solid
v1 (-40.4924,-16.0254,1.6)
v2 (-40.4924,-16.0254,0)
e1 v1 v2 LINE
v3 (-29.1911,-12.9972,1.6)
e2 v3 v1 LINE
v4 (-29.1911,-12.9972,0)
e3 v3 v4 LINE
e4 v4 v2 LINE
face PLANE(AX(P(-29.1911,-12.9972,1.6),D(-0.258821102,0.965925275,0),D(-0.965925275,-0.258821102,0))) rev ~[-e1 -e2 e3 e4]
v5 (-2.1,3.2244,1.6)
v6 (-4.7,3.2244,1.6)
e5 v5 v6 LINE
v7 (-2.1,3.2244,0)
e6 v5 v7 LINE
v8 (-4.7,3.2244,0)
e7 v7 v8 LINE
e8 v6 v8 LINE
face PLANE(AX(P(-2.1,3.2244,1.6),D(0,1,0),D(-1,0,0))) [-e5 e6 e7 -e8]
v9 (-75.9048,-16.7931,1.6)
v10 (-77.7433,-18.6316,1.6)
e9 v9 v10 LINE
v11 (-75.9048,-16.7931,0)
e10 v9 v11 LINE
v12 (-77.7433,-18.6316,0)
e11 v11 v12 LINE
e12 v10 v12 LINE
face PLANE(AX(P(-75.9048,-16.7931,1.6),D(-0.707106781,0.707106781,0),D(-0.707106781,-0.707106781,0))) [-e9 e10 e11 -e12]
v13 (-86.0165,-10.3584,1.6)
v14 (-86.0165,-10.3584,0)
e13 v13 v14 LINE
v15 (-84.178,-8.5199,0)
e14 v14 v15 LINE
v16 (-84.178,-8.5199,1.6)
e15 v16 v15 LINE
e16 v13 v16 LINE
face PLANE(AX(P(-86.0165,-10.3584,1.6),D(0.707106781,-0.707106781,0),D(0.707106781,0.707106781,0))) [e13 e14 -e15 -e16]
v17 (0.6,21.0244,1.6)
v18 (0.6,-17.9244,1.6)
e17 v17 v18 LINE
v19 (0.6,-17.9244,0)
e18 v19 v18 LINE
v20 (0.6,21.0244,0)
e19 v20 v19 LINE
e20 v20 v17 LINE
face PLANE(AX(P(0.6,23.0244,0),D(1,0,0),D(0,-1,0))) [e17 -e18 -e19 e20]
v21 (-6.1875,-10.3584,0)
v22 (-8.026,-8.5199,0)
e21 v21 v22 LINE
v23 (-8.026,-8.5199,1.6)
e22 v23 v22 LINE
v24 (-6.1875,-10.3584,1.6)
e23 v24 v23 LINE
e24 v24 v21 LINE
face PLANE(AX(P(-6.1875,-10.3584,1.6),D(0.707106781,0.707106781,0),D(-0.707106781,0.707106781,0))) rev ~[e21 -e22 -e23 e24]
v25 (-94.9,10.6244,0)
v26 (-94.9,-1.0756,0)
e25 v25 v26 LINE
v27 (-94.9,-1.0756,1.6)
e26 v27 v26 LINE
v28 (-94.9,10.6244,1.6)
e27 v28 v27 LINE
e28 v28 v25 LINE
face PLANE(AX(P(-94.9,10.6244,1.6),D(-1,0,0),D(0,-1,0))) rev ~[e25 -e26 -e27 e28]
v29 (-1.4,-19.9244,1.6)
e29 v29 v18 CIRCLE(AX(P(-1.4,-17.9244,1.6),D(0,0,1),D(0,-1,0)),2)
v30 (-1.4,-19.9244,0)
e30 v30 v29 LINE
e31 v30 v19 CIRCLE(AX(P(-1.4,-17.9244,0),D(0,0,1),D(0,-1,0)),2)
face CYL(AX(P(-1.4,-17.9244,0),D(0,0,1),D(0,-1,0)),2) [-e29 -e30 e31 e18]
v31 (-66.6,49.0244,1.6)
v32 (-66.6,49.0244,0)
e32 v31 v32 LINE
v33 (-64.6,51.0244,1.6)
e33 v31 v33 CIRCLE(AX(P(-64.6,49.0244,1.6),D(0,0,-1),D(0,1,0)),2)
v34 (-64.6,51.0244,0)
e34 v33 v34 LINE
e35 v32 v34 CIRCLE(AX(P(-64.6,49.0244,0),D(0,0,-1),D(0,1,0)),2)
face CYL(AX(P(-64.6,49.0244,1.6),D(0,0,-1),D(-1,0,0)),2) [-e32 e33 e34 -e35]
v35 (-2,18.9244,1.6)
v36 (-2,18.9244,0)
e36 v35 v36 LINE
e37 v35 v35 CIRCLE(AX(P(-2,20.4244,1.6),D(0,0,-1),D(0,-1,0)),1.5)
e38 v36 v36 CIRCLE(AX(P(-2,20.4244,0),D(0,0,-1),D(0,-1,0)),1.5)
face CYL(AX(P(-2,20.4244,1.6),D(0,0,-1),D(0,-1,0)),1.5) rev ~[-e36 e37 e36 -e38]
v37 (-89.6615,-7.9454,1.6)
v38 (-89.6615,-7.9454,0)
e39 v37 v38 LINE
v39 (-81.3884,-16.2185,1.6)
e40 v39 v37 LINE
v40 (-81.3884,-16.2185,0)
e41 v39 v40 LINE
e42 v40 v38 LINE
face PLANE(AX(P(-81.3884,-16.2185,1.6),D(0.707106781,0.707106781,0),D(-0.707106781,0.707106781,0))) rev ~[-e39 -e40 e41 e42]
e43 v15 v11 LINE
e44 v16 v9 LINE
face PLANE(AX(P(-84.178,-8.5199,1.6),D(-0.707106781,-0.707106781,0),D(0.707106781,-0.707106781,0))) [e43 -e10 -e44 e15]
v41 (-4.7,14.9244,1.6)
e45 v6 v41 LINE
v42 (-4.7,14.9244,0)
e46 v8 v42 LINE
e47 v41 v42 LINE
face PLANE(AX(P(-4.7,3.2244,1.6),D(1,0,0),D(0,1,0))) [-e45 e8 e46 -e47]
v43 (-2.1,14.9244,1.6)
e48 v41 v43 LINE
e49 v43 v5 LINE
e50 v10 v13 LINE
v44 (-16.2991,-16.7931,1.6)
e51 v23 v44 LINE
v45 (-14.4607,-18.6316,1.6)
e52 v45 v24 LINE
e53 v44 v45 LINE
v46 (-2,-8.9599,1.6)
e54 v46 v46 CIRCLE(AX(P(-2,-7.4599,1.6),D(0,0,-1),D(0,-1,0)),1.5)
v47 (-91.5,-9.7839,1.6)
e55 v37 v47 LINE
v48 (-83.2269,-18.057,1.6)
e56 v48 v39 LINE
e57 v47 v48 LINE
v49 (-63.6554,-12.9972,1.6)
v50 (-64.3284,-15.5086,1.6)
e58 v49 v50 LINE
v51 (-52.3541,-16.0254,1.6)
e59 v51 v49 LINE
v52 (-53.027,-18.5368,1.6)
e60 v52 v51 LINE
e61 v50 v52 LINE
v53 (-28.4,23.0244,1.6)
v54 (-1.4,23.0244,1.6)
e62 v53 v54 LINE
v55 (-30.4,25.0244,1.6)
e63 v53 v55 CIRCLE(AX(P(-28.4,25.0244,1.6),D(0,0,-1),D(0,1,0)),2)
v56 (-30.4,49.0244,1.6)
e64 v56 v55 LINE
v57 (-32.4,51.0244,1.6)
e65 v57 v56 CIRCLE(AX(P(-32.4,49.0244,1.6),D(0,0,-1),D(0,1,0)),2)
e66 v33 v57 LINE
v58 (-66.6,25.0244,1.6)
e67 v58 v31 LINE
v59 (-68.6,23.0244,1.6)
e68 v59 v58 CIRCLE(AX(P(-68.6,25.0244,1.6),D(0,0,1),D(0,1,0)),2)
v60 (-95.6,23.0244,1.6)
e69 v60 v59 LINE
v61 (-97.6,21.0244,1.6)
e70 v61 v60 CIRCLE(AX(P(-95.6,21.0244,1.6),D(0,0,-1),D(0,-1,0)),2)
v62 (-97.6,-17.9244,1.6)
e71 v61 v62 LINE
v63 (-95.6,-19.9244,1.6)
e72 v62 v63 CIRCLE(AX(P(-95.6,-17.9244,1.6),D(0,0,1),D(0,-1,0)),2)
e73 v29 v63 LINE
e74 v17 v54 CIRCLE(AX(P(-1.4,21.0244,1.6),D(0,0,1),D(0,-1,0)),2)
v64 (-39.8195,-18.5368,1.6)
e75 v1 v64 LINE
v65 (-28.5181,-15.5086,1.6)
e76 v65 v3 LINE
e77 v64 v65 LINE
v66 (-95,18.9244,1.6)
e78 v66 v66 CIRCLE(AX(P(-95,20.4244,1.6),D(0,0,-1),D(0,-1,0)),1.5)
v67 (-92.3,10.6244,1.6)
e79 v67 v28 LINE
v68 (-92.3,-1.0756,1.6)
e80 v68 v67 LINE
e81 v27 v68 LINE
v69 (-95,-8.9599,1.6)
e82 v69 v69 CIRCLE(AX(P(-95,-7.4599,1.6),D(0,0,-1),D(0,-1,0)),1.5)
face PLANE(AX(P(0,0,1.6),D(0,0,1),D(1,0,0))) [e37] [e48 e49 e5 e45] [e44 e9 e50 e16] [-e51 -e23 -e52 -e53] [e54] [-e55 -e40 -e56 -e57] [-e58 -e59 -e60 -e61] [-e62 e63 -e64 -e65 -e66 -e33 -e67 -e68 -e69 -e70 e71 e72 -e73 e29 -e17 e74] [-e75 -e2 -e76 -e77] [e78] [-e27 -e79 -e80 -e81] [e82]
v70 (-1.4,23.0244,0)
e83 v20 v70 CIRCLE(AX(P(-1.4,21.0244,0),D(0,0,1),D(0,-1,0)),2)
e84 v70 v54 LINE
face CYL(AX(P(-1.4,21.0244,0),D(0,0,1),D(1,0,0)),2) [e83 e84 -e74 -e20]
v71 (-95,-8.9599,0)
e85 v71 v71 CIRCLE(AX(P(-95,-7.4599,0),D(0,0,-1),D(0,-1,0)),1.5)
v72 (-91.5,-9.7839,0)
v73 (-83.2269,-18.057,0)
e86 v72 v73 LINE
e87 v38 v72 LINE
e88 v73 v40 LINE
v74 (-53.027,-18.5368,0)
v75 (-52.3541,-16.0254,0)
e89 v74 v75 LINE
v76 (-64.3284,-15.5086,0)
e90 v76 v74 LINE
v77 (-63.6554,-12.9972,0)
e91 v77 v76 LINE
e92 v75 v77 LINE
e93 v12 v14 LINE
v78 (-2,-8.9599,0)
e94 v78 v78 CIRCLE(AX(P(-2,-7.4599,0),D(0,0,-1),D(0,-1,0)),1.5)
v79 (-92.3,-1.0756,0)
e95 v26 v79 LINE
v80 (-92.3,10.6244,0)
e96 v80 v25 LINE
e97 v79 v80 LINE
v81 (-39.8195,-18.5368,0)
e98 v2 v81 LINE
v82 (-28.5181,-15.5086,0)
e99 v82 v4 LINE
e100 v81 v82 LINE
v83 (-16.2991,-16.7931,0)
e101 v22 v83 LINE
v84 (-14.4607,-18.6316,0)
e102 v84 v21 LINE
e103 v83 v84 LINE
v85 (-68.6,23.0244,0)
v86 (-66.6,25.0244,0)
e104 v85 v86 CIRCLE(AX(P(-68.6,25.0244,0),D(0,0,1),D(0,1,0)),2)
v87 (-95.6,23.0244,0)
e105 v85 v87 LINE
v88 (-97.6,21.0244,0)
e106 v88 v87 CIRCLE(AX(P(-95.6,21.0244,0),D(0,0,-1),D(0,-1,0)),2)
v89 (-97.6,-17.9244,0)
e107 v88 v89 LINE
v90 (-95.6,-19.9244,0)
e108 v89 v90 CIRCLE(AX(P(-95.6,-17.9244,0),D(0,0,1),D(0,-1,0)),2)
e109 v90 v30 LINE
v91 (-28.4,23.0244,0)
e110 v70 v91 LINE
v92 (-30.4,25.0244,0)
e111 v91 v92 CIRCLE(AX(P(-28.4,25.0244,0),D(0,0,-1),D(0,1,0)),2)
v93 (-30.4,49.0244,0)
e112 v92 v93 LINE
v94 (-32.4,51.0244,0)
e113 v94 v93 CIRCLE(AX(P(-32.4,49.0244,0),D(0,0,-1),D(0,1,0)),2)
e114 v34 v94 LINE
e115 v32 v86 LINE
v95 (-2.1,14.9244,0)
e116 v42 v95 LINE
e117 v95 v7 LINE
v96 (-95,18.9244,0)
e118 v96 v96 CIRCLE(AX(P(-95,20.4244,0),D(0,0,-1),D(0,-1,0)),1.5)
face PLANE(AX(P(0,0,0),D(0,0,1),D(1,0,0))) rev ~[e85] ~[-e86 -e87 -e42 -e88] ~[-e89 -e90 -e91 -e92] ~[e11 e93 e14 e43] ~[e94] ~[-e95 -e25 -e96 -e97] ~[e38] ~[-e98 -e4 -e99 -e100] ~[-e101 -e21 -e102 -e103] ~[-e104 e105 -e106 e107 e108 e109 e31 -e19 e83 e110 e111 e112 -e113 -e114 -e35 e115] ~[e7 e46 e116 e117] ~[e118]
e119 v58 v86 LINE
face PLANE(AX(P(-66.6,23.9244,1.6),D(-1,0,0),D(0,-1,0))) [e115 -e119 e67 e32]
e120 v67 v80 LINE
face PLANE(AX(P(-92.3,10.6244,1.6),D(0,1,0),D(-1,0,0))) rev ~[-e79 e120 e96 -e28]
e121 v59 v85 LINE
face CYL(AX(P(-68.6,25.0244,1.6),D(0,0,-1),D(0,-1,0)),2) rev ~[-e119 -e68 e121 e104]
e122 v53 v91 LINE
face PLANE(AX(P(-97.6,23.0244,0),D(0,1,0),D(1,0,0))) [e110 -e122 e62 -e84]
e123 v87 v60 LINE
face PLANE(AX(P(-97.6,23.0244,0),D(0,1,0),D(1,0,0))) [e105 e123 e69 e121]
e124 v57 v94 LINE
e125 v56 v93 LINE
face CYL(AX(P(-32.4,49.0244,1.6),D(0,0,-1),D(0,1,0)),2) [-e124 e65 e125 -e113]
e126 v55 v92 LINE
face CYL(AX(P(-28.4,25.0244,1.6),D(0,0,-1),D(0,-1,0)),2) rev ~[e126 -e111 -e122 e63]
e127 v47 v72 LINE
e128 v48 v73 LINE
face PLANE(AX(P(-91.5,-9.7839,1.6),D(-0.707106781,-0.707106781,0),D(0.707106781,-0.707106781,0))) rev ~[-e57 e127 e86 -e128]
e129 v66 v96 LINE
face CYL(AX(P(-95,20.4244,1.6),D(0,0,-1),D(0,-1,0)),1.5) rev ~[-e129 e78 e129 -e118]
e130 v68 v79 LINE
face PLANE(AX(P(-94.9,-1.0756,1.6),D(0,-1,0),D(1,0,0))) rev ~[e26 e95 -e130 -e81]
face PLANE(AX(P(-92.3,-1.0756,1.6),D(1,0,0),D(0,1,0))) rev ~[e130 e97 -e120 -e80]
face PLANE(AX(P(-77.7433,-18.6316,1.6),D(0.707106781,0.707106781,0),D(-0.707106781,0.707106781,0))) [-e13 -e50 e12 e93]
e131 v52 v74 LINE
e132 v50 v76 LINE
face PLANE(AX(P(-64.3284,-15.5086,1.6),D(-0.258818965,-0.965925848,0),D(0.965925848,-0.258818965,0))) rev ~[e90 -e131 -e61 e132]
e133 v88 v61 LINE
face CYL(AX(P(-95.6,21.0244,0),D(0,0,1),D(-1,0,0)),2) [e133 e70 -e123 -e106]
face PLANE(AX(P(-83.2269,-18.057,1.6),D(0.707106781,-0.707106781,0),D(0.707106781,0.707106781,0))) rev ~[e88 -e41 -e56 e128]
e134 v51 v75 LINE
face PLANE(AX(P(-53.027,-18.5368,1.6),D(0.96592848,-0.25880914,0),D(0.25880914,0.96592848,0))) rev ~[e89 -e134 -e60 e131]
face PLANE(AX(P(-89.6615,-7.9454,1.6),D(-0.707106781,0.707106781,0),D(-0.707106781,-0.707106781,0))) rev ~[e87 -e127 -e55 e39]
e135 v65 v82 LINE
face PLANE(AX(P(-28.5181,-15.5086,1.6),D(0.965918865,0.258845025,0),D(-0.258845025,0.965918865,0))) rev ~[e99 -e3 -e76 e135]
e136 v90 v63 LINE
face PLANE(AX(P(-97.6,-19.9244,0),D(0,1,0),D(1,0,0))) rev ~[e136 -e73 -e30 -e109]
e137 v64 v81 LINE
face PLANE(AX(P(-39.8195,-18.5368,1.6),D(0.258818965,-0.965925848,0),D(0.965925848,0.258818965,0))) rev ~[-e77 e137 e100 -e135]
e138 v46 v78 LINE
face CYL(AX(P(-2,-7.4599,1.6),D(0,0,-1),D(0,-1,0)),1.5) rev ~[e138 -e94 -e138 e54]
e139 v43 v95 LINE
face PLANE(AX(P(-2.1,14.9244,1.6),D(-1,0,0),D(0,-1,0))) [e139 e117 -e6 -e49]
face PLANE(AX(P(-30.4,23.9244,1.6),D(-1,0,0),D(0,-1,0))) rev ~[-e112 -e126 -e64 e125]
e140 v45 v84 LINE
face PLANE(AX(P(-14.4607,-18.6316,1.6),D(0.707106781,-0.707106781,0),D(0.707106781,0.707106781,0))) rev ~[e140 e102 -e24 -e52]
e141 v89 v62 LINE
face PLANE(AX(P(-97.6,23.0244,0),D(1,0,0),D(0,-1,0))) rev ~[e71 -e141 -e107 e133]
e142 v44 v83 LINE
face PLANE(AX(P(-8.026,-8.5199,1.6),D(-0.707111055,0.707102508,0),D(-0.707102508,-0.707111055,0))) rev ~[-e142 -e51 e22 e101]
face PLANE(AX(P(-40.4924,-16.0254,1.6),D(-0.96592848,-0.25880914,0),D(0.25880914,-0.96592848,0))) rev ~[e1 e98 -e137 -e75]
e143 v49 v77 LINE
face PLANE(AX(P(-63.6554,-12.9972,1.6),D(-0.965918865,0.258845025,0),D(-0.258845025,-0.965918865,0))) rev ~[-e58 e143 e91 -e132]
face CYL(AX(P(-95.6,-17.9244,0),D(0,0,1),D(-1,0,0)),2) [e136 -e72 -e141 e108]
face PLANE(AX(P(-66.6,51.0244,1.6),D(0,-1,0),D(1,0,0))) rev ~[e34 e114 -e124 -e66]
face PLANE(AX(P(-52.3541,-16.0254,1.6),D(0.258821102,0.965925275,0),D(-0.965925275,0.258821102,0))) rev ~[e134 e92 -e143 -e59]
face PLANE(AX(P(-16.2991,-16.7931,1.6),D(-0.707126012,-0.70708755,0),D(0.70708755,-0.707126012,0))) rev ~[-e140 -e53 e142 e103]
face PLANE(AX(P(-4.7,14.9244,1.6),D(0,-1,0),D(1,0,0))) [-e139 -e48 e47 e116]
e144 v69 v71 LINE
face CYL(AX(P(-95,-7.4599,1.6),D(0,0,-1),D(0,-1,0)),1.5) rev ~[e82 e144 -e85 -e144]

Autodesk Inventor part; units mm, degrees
ref_plane "YZ Plane" through (0, 0, 0) normal (1, 0, 0) x (0, 1, 0)
ref_plane "XZ Plane" through (0, 0, 0) normal (0, 1, 0) x (-1, 0, 0)
ref_plane "XY Plane" through (0, 0, 0) normal (0, 0, 1) x (1, 0, 0)
sketch "Szkic1" plane through (0, 0, 0) normal (0, 0, 1) x (1, 0, 0)
  circle A0 centre (-2, -7.4599) radius 1.4 projected
  circle A1 centre (-2, 20.4244) radius 1.4 projected
  circle A2 centre (-95, -7.4599) radius 1.4 projected
  circle A3 centre (-95, 20.4244) radius 1.4 projected
  line L0 (-98.5, 23.9244) -> (-98.5, -20.9244) projected
  line L1 (-97.6, 23.9244) -> (-97.6, -20.9244)
  line L2 (-98.5, -20.9244) -> (-91.5, -20.9244) projected
  line L3 (-98.5, 23.9244) -> (-91.5, 23.9244) projected
  line L4 (-98.5, -19.9244) -> (-91.5, -19.9244)
  line L5 (-91.5, -7.4599) -> (-91.5, -20.9244) projected
  line L6 (-97.6, 23.0244) -> (-92.3999, 23.0244)
  line L7 (-48.5, -51.6271) -> (-48.5, 68.0164)
  line L8 (-97.6, -19.9244) -> (-48.5, -19.9244)
  line L9 (-48.5, -19.9244) -> (-48.5, 23.0244)
  line L10 (-48.5, 23.0244) -> (-97.6, 23.0244)
  line L11 (-97.6, 23.0244) -> (-97.6, -19.9244)
  line L12 (0.6, -19.9244) -> (-48.5, -19.9244)
  line L13 (-48.5, 23.0244) -> (0.6, 23.0244)
  line L14 (0.6, 23.0244) -> (0.6, -19.9244)
  point P0 (0, 0)
  dimension "d0" = 0.9
  dimension "d1" = 1
  dimension "d2" = 0.9
extrude "Wyciągnięcie proste1" add sketch "Szkic1" along normal blind 1.6 contours L1 L6 L10 L7 L8 L4 | L7 L13 L14 L12
sketch "Szkic2" plane through (0, 0, 1.6) normal (0, 0, 1) x (1, 0, 0)
  line L0 (-29.5, 25.9244) -> (-29.5, 36.1286) projected
  line L1 (-31.5, 51.9244) -> (-65.5, 51.9244) projected
  line L2 (-67.5, 36.1286) -> (-67.5, 25.9244) projected
  line L3 (0.6, 23.0244) -> (-97.6, 23.0244) projected
  line L4 (-29.5, 23.0244) -> (-67.5, 23.0244)
  line L5 (-67.5, 23.0244) -> (-67.5, 51.9244)
  line L6 (-67.5, 51.9244) -> (-29.5, 51.9244)
  line L7 (-29.5, 51.9244) -> (-29.5, 23.0244)
  line L8 (-30.4, 23.9244) -> (-66.6, 23.9244)
  line L9 (-66.6, 23.9244) -> (-66.6, 51.0244)
  line L10 (-66.6, 51.0244) -> (-30.4, 51.0244)
  line L11 (-30.4, 51.0244) -> (-30.4, 23.9244)
  line L12 (-30.4, 23.9244) -> (-30.4, 23.0244)
  line L13 (-66.6, 23.9244) -> (-66.6, 23.0244)
  point P0 (0, 0)
  point P1 (-67.5, 37.4744)
  point P2 (-29.5, 37.4744)
  point P3 (-29.5, 31.0265)
  point P4 (-48.5, 51.9244)
  dimension "d5" = 0.9
extrude "Wyciągnięcie proste2" add sketch "Szkic2" against normal blind 1.6 contours L3 L13 L8 L12 | L8 L9 L10 L11
sketch "Szkic3" plane through (0, 0, 1.6) normal (0, 0, 1) x (1, 0, 0)
  line L0 (-94.4, -0.5756) -> (-94.4, 10.1244) projected
  line L1 (-94.4, 10.1244) -> (-92.8, 10.1244) projected
  line L2 (-92.8, 10.1244) -> (-92.8, -0.5756) projected
  line L3 (-94.4, -0.5756) -> (-92.8, -0.5756) projected
  line L4 (-77.7433, -17.9244) -> (-76.6119, -16.7931) projected
  line L5 (-77.7433, -17.9244) -> (-85.3094, -10.3584) projected
  line L6 (-84.178, -9.227) -> (-76.6119, -16.7931) projected
  line L7 (-85.3094, -10.3584) -> (-84.178, -9.227) projected
  line L8 (-63.3019, -13.6096) -> (-52.9665, -16.379) projected
  line L9 (-63.716, -15.1551) -> (-63.3019, -13.6096) projected
  line L10 (-53.3806, -17.9244) -> (-63.716, -15.1551) projected
  line L11 (-29.1305, -15.1551) -> (-39.4659, -17.9244) projected
  line L12 (-39.88, -16.379) -> (-29.5446, -13.6096) projected
  line L13 (-29.1305, -15.1551) -> (-29.5446, -13.6096) projected
  line L14 (-39.4659, -17.9244) -> (-39.88, -16.379) projected
  line L15 (-53.3806, -17.9244) -> (-52.9665, -16.379) projected
  line L16 (-14.4607, -17.9244) -> (-15.592, -16.7931) projected
  line L17 (-15.592, -16.7931) -> (-8.026, -9.227) projected
  line L18 (-6.8946, -10.3584) -> (-14.4607, -17.9244) projected
  line L19 (-6.8946, -10.3584) -> (-8.026, -9.227) projected
  line L20 (-2.6, 14.4244) -> (-4.2, 14.4244) projected
  line L21 (-4.2, 3.7244) -> (-4.2, 14.4244) projected
  line L22 (-2.6, 3.7244) -> (-4.2, 3.7244) projected
  line L23 (-2.6, 14.4244) -> (-2.6, 3.7244) projected
  line L24 (-92.3, -1.0756) -> (-92.3, 10.6244)
  line L25 (-92.3, 10.6244) -> (-94.9, 10.6244)
  line L26 (-94.9, 10.6244) -> (-94.9, -1.0756)
  line L27 (-94.9, -1.0756) -> (-92.3, -1.0756)
  line L28 (-75.9048, -16.7931) -> (-77.7433, -18.6316)
  line L29 (-77.7433, -18.6316) -> (-86.0165, -10.3584)
  line L30 (-86.0165, -10.3584) -> (-84.178, -8.5199)
  line L31 (-84.178, -8.5199) -> (-75.9048, -16.7931)
  line L32 (-52.3541, -16.0254) -> (-63.6554, -12.9972)
  line L33 (-63.6554, -12.9972) -> (-64.3284, -15.5086)
  line L34 (-64.3284, -15.5086) -> (-53.027, -18.5368)
  line L35 (-53.027, -18.5368) -> (-52.3541, -16.0254)
  line L36 (-29.1911, -12.9972) -> (-40.4924, -16.0254)
  line L37 (-40.4924, -16.0254) -> (-39.8195, -18.5368)
  line L38 (-39.8195, -18.5368) -> (-28.5181, -15.5086)
  line L39 (-28.5181, -15.5086) -> (-29.1911, -12.9972)
  line L40 (-8.026, -8.5199) -> (-16.2991, -16.7931)
  line L41 (-16.2991, -16.7931) -> (-14.4607, -18.6316)
  line L42 (-14.4607, -18.6316) -> (-6.1875, -10.3584)
  line L43 (-6.1875, -10.3584) -> (-8.026, -8.5199)
  line L44 (-4.7, 3.2244) -> (-4.7, 14.9244)
  line L45 (-4.7, 14.9244) -> (-2.1, 14.9244)
  line L46 (-2.1, 14.9244) -> (-2.1, 3.2244)
  line L47 (-2.1, 3.2244) -> (-4.7, 3.2244)
  point P0 (0, 0)
  dimension "d8" = 0.5
  dimension "d9" = 0.5
  dimension "d10" = 0.5
  dimension "d11" = 0.5
  dimension "d12" = 0.5
  dimension "d13" = 0.5
extrude "Wyciągnięcie proste3" cut sketch "Szkic3" against normal blind 1.6 contours L0 L1 L2 L3 | L5 L7 L6 L4 | L8 L15 L10 L9 | L11 L14 L12 L13 | L16 L17 L19 L18 | L23 L22 L21 L20 | L27 L26 L25 L24 | L28 L29 L30 L31 | L35 L34 L33 L32 | L39 L38 L37 L36 | L43 L42 L41 L40 | L44 L45 L46 L47
fillet "Zaokrąglenie1" radius 2 8 edges at (-66.6, 51.0244, 0.8) (-66.6, 23.0244, 0.8) (-97.6, 23.0244, 0.8) (-97.6, -19.9244, 0.8) (0.6, 23.0244, 0.8) (0.6, -19.9244, 0.8) (-30.4, 23.0244, 0.8) (-30.4, 51.0244, 0.8)
sketch "Szkic4" plane through (0, 0, 1.6) normal (0, 0, 1) x (1, 0, 0)
  circle A0 centre (-2, 20.4244) radius 1.4 projected
  circle A1 centre (-2, -7.4599) radius 1.4 projected
  circle A2 centre (-95, 20.4244) radius 1.4 projected
  circle A3 centre (-95, -7.4599) radius 1.4 projected
  point P0 (0, 0)
hole "Otwór1" at (-2, 20.4244, 1.6) at (-2, -7.4599, 1.6) at (-95, 20.4244, 1.6) at (-95, -7.4599, 1.6) direction (0, 0, -1) diameter 3 end through all
sketch "Szkic5" plane through (0, 0, 1.6) normal (0, 0, 1) x (1, 0, 0)
  circle A0 centre (-95, 20.4244) radius 1.5 projected
  circle A1 centre (-2, 20.4244) radius 1.5 projected
  circle A2 centre (-2, -7.4599) radius 1.5 projected
  circle A3 centre (-95, -7.4599) radius 1.5 projected
  arc A4 (-30.4, 49.0244) -> (-32.4, 51.0244) centre (-32.4, 49.0244) ccw projected
  line L0 (-32.4, 51.0244) -> (-64.6, 51.0244) projected
  arc A5 (-64.6, 51.0244) -> (-66.6, 49.0244) centre (-64.6, 49.0244) ccw projected
  line L1 (-66.6, 49.0244) -> (-66.6, 25.0244) projected
  arc A6 (-68.6, 23.0244) -> (-66.6, 25.0244) centre (-68.6, 25.0244) ccw projected
  line L2 (-68.6, 23.0244) -> (-95.6, 23.0244) projected
  arc A7 (-95.6, 23.0244) -> (-97.6, 21.0244) centre (-95.6, 21.0244) ccw projected
  line L3 (-97.6, 21.0244) -> (-97.6, -17.9244) projected
  arc A8 (-97.6, -17.9244) -> (-95.6, -19.9244) centre (-95.6, -17.9244) ccw projected
  line L4 (-95.6, -19.9244) -> (-1.4, -19.9244) projected
  arc A9 (-1.4, -19.9244) -> (0.6, -17.9244) centre (-1.4, -17.9244) ccw projected
  line L5 (0.6, -17.9244) -> (0.6, 21.0244) projected
  arc A10 (0.6, 21.0244) -> (-1.4, 23.0244) centre (-1.4, 21.0244) ccw projected
  line L6 (-1.4, 23.0244) -> (-28.4, 23.0244) projected
  arc A11 (-30.4, 25.0244) -> (-28.4, 23.0244) centre (-28.4, 25.0244) ccw projected
  line L7 (-30.4, 25.0244) -> (-30.4, 49.0244) projected
  line L8 (-94.9, -1.0756) -> (-94.9, 10.6244) projected
  line L9 (-94.9, 10.6244) -> (-92.3, 10.6244) projected
  line L10 (-92.3, 10.6244) -> (-92.3, -1.0756) projected
  line L11 (-92.3, -1.0756) -> (-94.9, -1.0756) projected
  line L12 (-6.1875, -10.3584) -> (-14.4607, -18.6316) projected
  line L13 (-14.4607, -18.6316) -> (-16.2991, -16.7931) projected
  line L14 (-16.2991, -16.7931) -> (-8.026, -8.5199) projected
  line L15 (-8.026, -8.5199) -> (-6.1875, -10.3584) projected
  line L16 (-28.5181, -15.5086) -> (-39.8195, -18.5368) projected
  line L17 (-39.8195, -18.5368) -> (-40.4924, -16.0254) projected
  line L18 (-40.4924, -16.0254) -> (-29.1911, -12.9972) projected
  line L19 (-29.1911, -12.9972) -> (-28.5181, -15.5086) projected
  line L20 (-77.7433, -18.6316) -> (-86.0165, -10.3584) projected
  line L21 (-86.0165, -10.3584) -> (-84.178, -8.5199) projected
  line L22 (-84.178, -8.5199) -> (-75.9048, -16.7931) projected
  line L23 (-75.9048, -16.7931) -> (-77.7433, -18.6316) projected
  line L24 (-4.7, 14.9244) -> (-2.1, 14.9244) projected
  line L25 (-2.1, 14.9244) -> (-2.1, 3.2244) projected
  line L26 (-2.1, 3.2244) -> (-4.7, 3.2244) projected
  line L27 (-4.7, 3.2244) -> (-4.7, 14.9244) projected
  line L28 (-53.027, -18.5368) -> (-64.3284, -15.5086) projected
  line L29 (-64.3284, -15.5086) -> (-63.6554, -12.9972) projected
  line L30 (-63.6554, -12.9972) -> (-52.3541, -16.0254) projected
  line L31 (-52.3541, -16.0254) -> (-53.027, -18.5368) projected
  line L32 (-91.5, -9.7839) -> (-83.2269, -18.057)
  line L33 (-83.2269, -18.057) -> (-81.3884, -16.2185)
  line L34 (-81.3884, -16.2185) -> (-89.6615, -7.9454)
  line L35 (-89.6615, -7.9454) -> (-91.5, -9.7839)
  line L36 (-91.5, -7.4599) -> (-91.5, -20.9244) projected
  line L37 (-77.7433, -18.057) -> (-77.7433, -19.9244) construction
  line L38 (-83.2269, -18.057) -> (-83.2269, -19.9244) construction
  point P0 (0, 0)
extrude "Wyciągnięcie proste4" cut sketch "Szkic5" against normal through all contours L35 L34 L33 L32
properties part number "main_pcb"
